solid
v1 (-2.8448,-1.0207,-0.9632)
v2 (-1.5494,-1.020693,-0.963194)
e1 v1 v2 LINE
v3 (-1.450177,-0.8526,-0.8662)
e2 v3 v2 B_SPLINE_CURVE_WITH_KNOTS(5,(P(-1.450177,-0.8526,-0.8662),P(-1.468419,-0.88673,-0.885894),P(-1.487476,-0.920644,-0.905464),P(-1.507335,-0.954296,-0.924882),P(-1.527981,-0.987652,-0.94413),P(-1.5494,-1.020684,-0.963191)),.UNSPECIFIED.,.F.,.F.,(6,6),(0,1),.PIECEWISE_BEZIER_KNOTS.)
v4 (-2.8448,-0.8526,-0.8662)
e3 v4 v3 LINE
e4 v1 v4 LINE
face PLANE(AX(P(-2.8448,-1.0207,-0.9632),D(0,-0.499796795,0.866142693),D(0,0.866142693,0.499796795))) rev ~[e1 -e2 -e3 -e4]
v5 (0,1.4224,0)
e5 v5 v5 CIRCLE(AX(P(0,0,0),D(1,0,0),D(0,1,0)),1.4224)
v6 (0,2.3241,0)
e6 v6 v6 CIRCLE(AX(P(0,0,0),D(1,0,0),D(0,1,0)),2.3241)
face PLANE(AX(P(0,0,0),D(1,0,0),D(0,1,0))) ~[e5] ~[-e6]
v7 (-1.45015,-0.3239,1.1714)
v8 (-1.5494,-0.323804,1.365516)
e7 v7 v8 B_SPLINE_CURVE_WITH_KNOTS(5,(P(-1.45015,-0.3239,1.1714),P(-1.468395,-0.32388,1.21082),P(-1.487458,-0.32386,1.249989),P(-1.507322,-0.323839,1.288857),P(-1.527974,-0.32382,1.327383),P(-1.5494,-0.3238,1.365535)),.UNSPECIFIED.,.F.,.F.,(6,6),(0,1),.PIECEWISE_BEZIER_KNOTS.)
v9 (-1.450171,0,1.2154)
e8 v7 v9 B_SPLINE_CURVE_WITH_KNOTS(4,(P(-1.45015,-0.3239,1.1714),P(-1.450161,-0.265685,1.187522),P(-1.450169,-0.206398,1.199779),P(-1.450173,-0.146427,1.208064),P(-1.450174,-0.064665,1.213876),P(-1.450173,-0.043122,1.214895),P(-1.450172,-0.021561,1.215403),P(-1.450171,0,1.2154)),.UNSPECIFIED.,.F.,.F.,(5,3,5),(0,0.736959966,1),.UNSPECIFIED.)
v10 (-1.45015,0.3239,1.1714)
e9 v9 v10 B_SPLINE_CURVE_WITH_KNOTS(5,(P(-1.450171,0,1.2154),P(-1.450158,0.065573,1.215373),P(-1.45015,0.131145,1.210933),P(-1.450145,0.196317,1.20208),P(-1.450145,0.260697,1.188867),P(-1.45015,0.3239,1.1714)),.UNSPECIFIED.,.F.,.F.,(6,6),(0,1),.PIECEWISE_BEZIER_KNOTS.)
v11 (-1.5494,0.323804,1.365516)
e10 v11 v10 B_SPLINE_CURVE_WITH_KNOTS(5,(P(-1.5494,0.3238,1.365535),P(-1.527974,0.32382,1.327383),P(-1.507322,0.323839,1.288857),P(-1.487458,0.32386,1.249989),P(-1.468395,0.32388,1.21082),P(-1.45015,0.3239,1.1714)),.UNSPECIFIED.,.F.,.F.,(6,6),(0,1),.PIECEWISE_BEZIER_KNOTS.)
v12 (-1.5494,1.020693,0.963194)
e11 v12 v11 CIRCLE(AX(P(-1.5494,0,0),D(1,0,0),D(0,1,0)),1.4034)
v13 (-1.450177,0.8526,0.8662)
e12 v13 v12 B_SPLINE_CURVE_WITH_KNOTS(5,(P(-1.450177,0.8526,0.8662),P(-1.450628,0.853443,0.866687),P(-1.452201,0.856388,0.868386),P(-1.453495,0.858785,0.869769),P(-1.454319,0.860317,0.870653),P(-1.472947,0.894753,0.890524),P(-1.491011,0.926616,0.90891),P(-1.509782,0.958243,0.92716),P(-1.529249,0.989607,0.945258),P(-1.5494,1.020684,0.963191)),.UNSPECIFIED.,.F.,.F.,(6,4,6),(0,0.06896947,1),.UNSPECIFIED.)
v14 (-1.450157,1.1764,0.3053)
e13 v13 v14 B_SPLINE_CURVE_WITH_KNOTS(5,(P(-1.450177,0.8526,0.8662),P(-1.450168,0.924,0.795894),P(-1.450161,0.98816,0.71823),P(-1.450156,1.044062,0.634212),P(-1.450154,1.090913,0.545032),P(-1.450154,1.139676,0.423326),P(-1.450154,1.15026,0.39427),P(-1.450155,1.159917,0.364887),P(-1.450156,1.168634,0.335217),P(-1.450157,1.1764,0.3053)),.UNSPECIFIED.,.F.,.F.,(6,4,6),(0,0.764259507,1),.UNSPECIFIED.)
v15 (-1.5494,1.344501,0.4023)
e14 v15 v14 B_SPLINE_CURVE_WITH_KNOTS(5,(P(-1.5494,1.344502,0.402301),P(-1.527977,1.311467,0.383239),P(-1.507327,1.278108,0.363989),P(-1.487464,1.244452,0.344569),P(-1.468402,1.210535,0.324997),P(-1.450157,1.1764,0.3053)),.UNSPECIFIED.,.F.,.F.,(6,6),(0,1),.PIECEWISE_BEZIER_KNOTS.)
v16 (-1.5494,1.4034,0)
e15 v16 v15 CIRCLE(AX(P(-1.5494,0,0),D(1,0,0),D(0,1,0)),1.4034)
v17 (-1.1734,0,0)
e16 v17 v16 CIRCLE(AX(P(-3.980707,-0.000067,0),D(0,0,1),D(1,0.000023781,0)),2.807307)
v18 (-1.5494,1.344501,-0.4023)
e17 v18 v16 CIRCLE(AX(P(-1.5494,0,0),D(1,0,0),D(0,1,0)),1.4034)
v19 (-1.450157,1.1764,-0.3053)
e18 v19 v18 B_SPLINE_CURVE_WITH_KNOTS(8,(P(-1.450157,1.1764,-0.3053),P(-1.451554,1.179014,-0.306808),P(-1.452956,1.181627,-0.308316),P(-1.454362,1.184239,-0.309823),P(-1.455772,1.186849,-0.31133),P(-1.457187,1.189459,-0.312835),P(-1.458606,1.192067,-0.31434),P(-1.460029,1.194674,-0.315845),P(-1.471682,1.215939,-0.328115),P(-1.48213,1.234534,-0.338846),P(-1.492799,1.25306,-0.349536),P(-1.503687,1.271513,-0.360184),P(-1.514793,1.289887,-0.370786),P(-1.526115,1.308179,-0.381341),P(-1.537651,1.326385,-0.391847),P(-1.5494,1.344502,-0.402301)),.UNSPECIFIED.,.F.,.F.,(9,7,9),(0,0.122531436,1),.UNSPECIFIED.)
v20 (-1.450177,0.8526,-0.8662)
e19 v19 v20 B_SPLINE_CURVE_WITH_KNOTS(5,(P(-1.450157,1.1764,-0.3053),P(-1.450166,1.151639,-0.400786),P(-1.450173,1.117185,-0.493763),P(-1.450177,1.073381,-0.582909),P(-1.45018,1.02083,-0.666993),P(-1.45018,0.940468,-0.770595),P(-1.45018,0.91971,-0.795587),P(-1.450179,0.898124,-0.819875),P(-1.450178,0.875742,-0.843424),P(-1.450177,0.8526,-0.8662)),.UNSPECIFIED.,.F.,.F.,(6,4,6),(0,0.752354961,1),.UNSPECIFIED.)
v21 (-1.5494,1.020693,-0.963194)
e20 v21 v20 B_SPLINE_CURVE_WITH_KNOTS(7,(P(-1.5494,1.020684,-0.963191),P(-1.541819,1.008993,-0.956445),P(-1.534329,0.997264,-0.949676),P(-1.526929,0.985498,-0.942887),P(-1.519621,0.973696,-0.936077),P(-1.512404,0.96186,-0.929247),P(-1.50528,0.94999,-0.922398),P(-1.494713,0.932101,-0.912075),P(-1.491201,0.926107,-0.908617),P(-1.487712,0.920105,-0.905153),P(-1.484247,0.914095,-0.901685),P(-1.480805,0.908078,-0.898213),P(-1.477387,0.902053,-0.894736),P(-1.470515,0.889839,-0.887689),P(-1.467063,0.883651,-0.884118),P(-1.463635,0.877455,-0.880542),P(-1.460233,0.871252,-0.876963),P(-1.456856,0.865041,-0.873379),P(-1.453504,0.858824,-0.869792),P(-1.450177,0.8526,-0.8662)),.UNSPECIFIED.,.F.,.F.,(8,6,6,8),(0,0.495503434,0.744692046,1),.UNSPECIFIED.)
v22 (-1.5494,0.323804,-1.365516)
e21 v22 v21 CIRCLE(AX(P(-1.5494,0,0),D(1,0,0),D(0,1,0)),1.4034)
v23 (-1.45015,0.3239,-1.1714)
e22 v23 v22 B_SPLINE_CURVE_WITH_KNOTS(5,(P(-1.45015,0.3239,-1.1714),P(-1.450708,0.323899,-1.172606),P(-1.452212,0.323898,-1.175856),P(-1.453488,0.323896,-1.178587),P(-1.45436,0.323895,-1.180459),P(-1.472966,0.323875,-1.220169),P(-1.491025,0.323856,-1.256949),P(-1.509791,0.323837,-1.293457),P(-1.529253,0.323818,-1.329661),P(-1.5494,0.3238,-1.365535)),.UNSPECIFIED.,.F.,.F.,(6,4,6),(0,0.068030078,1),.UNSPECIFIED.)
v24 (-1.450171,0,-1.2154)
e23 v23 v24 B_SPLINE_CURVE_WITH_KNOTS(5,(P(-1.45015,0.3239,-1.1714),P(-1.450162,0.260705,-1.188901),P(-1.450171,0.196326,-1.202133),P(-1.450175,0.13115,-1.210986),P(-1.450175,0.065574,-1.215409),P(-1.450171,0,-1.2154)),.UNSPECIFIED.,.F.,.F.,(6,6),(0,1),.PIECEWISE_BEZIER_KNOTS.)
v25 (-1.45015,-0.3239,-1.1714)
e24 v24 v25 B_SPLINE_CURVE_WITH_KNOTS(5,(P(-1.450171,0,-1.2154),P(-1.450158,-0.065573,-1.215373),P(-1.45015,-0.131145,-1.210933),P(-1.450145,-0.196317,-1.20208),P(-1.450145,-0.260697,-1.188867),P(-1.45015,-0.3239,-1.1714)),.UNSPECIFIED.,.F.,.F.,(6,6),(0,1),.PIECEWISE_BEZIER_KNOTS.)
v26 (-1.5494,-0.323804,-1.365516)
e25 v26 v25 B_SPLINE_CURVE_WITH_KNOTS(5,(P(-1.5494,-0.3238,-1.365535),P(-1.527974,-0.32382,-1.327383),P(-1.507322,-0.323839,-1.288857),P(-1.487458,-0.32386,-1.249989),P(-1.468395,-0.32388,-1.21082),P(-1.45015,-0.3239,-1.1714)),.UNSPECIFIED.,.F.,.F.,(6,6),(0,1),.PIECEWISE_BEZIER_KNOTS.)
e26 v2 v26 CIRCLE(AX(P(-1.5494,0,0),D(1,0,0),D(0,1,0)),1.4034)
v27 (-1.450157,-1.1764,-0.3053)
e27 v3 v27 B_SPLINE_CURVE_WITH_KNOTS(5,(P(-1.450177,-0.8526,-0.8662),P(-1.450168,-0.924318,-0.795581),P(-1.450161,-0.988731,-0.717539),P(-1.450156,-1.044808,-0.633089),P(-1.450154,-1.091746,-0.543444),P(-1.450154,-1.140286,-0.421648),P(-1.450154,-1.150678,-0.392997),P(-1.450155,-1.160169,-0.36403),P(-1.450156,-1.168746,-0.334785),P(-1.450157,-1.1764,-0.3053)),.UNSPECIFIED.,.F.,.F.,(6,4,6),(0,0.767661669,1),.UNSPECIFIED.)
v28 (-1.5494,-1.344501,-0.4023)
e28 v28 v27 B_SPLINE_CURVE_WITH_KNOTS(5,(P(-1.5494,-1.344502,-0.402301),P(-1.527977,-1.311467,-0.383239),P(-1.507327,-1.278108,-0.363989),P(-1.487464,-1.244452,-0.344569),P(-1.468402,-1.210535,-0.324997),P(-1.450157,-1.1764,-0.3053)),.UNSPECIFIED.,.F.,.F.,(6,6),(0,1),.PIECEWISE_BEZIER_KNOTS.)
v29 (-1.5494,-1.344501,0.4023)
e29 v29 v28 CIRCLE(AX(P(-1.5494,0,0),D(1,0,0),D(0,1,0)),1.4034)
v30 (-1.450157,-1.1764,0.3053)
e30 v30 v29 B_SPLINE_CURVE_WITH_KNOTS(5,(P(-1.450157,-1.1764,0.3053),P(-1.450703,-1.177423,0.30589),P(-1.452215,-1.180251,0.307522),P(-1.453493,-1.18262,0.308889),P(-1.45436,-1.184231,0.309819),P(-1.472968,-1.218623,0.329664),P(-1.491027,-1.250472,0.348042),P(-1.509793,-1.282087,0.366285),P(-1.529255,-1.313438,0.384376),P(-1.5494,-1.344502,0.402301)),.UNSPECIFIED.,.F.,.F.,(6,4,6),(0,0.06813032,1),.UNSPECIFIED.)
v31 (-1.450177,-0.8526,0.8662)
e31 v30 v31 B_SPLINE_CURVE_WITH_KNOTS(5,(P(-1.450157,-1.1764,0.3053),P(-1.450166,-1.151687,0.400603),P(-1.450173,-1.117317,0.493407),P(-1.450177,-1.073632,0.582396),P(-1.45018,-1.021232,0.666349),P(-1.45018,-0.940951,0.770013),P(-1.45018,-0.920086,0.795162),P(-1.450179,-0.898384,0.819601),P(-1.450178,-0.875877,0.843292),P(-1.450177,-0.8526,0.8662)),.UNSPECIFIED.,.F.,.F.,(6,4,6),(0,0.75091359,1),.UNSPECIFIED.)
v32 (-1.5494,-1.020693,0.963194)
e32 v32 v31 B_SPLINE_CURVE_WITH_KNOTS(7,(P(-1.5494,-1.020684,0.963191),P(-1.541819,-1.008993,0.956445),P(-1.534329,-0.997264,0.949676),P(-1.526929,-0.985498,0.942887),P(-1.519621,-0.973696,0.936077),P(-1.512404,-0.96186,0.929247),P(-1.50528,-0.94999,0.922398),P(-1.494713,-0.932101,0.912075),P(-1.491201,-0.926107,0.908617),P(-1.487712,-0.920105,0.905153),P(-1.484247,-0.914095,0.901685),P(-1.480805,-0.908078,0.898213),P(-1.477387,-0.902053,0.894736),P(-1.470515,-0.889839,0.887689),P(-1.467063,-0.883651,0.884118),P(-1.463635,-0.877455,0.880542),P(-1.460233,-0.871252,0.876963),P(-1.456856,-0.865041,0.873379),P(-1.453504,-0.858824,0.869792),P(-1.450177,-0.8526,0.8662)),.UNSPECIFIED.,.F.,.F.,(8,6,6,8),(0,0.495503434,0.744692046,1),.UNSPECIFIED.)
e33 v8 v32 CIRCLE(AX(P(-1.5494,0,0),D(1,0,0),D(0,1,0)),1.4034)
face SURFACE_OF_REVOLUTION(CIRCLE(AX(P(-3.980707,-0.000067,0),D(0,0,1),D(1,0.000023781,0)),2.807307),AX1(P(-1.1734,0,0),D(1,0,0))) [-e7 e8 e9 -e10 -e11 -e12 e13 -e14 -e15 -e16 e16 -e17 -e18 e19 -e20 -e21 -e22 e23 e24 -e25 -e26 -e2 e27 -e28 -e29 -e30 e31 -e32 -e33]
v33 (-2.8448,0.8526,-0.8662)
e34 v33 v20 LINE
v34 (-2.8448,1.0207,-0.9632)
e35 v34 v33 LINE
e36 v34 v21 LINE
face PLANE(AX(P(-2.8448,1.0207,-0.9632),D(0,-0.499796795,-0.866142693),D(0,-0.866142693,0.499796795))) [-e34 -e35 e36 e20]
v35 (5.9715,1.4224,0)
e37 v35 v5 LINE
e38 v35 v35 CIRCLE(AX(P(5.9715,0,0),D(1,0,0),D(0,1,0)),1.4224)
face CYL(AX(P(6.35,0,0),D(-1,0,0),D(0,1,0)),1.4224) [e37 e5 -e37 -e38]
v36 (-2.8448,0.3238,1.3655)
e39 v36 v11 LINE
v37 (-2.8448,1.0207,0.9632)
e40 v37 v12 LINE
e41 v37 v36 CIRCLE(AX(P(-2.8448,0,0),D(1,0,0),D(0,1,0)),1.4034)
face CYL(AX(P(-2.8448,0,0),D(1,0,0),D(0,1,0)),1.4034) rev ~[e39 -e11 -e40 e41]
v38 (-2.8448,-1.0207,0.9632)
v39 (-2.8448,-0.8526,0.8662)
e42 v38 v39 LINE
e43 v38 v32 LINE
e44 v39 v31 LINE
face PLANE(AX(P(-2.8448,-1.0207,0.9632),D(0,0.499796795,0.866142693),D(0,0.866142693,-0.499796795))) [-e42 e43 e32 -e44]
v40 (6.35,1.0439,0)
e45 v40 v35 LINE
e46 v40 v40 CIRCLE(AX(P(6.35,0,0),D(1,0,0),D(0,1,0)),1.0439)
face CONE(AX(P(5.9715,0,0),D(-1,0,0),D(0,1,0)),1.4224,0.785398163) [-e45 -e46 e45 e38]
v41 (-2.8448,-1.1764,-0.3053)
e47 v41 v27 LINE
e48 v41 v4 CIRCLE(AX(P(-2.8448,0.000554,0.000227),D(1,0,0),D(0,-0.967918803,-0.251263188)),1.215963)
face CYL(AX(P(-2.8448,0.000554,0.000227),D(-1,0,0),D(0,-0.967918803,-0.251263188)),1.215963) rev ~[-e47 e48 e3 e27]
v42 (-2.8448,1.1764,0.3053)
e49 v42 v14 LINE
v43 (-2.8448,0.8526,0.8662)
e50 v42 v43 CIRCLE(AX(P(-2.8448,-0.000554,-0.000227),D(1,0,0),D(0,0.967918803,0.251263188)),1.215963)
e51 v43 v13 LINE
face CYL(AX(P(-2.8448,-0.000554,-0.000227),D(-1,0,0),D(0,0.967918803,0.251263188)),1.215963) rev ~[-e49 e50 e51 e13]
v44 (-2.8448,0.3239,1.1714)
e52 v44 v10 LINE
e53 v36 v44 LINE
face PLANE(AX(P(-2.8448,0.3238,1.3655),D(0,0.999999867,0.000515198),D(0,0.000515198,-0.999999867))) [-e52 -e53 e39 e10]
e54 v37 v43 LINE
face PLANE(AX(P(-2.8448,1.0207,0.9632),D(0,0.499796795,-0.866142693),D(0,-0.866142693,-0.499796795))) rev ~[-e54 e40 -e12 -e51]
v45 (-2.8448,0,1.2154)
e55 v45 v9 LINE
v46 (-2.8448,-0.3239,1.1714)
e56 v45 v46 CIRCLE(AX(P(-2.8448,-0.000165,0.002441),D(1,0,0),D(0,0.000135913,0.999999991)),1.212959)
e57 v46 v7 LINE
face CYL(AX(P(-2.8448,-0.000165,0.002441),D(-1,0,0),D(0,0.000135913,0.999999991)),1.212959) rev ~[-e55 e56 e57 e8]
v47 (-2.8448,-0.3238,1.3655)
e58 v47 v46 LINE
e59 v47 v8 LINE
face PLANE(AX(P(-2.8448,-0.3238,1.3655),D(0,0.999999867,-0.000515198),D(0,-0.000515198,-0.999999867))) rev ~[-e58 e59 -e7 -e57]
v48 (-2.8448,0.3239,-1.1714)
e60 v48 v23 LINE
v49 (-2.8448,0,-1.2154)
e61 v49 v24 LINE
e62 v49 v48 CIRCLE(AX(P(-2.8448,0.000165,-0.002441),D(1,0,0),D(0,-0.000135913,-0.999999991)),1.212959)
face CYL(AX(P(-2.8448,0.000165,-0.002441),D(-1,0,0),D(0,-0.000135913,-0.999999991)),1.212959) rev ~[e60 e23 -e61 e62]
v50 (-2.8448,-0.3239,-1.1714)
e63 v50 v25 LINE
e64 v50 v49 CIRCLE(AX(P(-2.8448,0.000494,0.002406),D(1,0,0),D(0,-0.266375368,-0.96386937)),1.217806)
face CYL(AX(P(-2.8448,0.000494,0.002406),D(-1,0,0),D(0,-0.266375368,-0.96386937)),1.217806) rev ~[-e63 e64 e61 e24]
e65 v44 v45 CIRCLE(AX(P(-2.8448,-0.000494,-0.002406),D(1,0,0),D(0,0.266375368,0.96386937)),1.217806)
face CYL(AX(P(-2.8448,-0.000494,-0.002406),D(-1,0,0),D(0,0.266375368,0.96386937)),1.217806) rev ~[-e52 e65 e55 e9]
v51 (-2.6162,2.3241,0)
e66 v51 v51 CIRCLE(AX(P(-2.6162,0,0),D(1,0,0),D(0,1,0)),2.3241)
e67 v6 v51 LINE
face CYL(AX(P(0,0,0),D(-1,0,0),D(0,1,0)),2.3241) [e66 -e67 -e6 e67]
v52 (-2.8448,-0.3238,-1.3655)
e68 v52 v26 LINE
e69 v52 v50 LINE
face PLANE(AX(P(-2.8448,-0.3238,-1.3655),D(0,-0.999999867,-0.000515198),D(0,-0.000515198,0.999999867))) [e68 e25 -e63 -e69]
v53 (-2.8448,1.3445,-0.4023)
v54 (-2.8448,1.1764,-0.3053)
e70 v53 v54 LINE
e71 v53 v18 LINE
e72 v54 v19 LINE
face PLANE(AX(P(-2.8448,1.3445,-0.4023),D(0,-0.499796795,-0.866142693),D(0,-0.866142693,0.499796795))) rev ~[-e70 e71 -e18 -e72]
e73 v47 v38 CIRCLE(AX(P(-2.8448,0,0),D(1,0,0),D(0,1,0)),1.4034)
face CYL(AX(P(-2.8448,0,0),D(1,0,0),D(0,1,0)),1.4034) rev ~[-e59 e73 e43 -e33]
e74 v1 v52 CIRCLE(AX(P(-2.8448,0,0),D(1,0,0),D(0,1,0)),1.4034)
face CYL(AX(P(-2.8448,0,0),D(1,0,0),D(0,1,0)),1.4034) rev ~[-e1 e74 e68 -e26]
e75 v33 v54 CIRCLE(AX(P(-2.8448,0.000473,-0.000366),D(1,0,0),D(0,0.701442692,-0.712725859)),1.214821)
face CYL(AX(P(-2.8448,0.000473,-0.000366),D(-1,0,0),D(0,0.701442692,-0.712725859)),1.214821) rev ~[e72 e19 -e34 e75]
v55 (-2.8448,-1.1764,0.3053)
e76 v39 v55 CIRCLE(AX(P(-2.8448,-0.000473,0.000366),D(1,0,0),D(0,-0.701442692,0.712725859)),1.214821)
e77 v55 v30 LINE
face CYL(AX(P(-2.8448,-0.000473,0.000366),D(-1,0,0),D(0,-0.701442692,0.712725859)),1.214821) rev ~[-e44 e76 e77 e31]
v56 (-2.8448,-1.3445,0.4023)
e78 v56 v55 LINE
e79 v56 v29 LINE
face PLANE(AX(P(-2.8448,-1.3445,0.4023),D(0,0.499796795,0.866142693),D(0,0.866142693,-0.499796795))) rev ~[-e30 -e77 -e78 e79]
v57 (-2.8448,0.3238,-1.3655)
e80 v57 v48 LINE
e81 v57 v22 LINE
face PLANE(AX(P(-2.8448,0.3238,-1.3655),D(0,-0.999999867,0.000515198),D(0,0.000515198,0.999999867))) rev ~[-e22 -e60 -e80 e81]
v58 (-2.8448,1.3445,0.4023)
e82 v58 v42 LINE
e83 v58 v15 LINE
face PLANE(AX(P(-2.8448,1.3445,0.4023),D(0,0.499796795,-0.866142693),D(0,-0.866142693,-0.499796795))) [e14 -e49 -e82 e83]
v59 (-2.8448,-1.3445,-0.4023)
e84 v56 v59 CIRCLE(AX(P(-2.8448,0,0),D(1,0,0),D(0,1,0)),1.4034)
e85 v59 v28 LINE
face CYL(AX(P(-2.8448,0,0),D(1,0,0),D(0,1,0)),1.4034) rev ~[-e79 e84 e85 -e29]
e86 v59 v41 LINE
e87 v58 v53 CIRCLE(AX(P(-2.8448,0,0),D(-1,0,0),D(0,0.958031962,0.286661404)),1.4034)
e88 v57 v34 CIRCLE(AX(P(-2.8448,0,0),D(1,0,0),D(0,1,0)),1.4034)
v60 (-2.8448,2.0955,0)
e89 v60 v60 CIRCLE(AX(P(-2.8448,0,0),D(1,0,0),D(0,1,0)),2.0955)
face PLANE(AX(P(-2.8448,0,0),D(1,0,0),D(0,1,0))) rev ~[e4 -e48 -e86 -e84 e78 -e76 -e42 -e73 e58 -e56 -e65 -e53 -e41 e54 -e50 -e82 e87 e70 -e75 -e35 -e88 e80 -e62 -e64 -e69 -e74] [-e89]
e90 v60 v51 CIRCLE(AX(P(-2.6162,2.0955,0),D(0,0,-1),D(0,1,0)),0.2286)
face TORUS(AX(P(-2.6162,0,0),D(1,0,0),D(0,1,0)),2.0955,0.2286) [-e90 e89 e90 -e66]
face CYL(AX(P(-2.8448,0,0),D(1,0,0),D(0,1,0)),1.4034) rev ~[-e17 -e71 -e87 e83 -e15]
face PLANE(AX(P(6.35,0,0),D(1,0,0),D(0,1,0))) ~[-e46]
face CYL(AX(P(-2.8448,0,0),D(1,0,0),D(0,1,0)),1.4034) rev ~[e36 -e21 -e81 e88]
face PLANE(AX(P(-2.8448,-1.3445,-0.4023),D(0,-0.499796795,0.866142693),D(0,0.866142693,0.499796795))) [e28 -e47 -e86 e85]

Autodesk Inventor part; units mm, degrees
ref_plane "YZ Plane" through (0, 0, 0) normal (1, 0, 0) x (0, 1, 0)
sketch "Sketch1" plane through (0, 0, 0) normal (0, 0, 1) x (1, 0, 0)
  line L0 (-2.8448, 0) -> (6.35, 0)
  line L1 (6.35, 0) -> (6.35, 1.4224)
  line L2 (6.35, 1.4224) -> (0, 1.4224)
  line L3 (0, 1.4224) -> (0, 2.3241)
  line L4 (-7.3162, 0) -> (16.036, 0) projected
  line L5 (0, -0.4648) -> (0, 2.7889) projected
  line L6 (0, 2.3241) -> (-2.8448, 2.3241)
  line L7 (-2.8448, 0) -> (-2.8448, 2.3241)
  arc A0 (-1.1734, 0) -> (-1.5494, 1.4034) centre (-3.9802, 0) ccw
  line L8 (-2.8448, 1.4034) -> (-1.5494, 1.4034)
  line L9 (12.7, 1.4224) -> (0, 1.4224) construction
  dimension "d0" = 6.35
  dimension "d1" = 2.8448
  dimension "d2" = 2.8448
  dimension "d5" = 4.6482
  dimension "d13" = 2.8068
  dimension "d14" = 2.8068
  dimension "d15" = 1.2954
revolve "Body" add sketch "Sketch1" angle 360 about axis through (-2.8448, 0, 0) along (1, 0, 0) contours A0 L8 L7 L6 L3 L5 L0 | L5 L2 L1 L0
ref_plane "IDS_WORKPLANE{1}" through (-2.8448, 0, 0) normal (1, 0, 0) x (0, 0, -1)
sketch "Sketch2" plane through (-2.8448, 0, 0) normal (1, 0, 0) x (0, 0, -1)
  line L0 (0, -3.6027) -> (0, 5.3473) projected
  line L1 (5.6384, 0) -> (-3.6512, 0) projected
  circle A0 centre (0, 0) radius 2.3241 projected
  line L2 (1.3655, 0.3238) -> (1.1714, 0.3239)
  line L3 (0, 0) -> (1.3655, 0.3238) construction
  line L4 (0, 0) -> (4.3113, 4.0687) construction
  line L5 (0, 0) -> (0.4023, 1.3445) construction
  line L6 (0, 0) -> (0.7017, 1.2154) construction
  line L7 (0.4023, 1.3445) -> (0.3053, 1.1764)
  line L8 (0.9632, 1.0207) -> (0.8662, 0.8526)
  line L9 (0, 0) -> (0.9632, 1.0207) construction
  arc A1 (1.2154, 0) -> (1.1714, 0.3239) centre (0, 0) ccw
  arc A2 (0.8662, 0.8526) -> (0.3053, 1.1764) centre (0, 0) ccw
  arc A3 (1.4034, 0) -> (1.3655, 0.3238) centre (0, 0) ccw
  arc A4 (0.9632, 1.0207) -> (0.4023, 1.3445) centre (0, 0) ccw
  arc A5 (1.3655, 0.3238) -> (0.8276, 1.1334) centre (0, 0) ccw construction
  arc A6 (1.1714, 0.3239) -> (0.8662, 0.8526) centre (0, 0) ccw construction
  line L10 (1.3655, -0.3238) -> (1.1714, -0.3239)
  line L11 (0.4023, -1.3445) -> (0.3053, -1.1764)
  line L12 (0.9632, -1.0207) -> (0.8662, -0.8526)
  arc A7 (1.1714, -0.3239) -> (1.2154, 0) centre (0, 0) ccw
  arc A8 (0.3053, -1.1764) -> (0.8662, -0.8526) centre (0, 0) ccw
  arc A9 (1.3655, -0.3238) -> (1.4034, 0) centre (0, 0) ccw
  arc A10 (0.4023, -1.3445) -> (0.9632, -1.0207) centre (0, 0) ccw
  line L13 (-1.3655, 0.3238) -> (-1.1714, 0.3239)
  line L14 (-0.4023, 1.3445) -> (-0.3053, 1.1764)
  line L15 (-0.9632, 1.0207) -> (-0.8662, 0.8526)
  arc A11 (-1.1714, 0.3239) -> (-1.2154, 0) centre (0, 0) ccw
  arc A12 (-0.3053, 1.1764) -> (-0.8662, 0.8526) centre (0, 0) ccw
  arc A13 (-1.3655, 0.3238) -> (-1.4034, 0) centre (0, 0) ccw
  arc A14 (-0.4023, 1.3445) -> (-0.9632, 1.0207) centre (0, 0) ccw
  line L16 (-0.4023, -1.3445) -> (-0.3053, -1.1764)
  arc A15 (-0.8662, -0.8526) -> (-0.3053, -1.1764) centre (0, 0) ccw
  line L17 (-0.9632, -1.0207) -> (-0.8662, -0.8526)
  arc A16 (-0.9632, -1.0207) -> (-0.4023, -1.3445) centre (0, 0) ccw
  arc A17 (-1.2154, 0) -> (-1.1714, -0.3239) centre (0, 0) ccw
  line L18 (-1.3655, -0.3238) -> (-1.1714, -0.3239)
  arc A18 (-1.4034, 0) -> (-1.3655, -0.3238) centre (0, 0) ccw
  point P0 (0.7017, -1.2154)
  point P1 (-0.7017, 1.2154)
  point P2 (-0.7017, -1.2154)
  dimension "d19" = 0.3239
  dimension "d20" = 0.6477
  dimension "d21" = 33.316
  dimension "d22" = 2.8068
  dimension "d23" = 2.4308
extrude "Slot" add sketch "Sketch2" along normal up to next contours A1 L2 A3 L1 | L1 A9 L10 A7 | A17 L18 A18 L1 | L1 A13 L13 A11 | A4 L8 A2 L7 | L11 A8 L12 A10 | L14 A12 L15 A14 | A16 L17 A15 L16
fillet "Fillet1" radius 0.2286 1 edges at (-2.8448, -2.3241, 0)
thread "Thread" size "4-40 UNC" class "2A" standard "ANSI Unified Screw Threads" length 4.7625
chamfer "Chamfer1" distance 0.3785 distance2 0.3785 1 edges at (6.35, -1.4224, 0) measured on face at (6.35, -0.3549, 0.3144)
ref_plane "Work Plane2" through (-1.4224, 0, 0) normal (0, 0, -1) x (1, 0, 0)
equation "\"d19\" = 0.5 * SBR"
equation "\"d20\" = SBR"
equation "\"d22\" = 1.1547 * SW"
equation "\"d23\" = SW"
equation "\"d17\" = INTI"
equation "\"d24\" = RR"
equation "\"d6\" = GEL"
equation "\"d9\" = -0.5 * SPD + 0.5 * NND"
equation "\"d10\" = GUL"
equation "\"d0\" = NLG"
equation "\"d1\" = KOH"
equation "\"d2\" = NND"
equation "\"d5\" = KOD"
equation "\"d13\" = 1.1547 * SW"
equation "\"d14\" = 1.1547 * SW"
equation "\"d15\" = INTI"
equation "\"NND\" = 2.8448"
equation "\"NLG\" = 6.35"
equation "\"GEL\" = 4.7625"
equation "\"KOD\" = 4.6482"
equation "\"KOH\" = 2.8448"
equation "\"SPD\" = GD1"
equation "\"GUL\" = 0.37846"
equation "\"SBR\" = 0.6477"
equation "\"INTI\" = 1.2954"
equation "\"d11\" = -KOH"
equation "\"SW\" = 2.43078"
equation "\"d16\" = 1.1547 * SW"
equation "\"d18\" = SW"
equation "\"RR\" = 0.2286"
equation "\"TOA\" = 30deg"
equation "\"GD1\" = 2.08788"
equation "\"THREADDIA\" = 2.8448"
equation "\"BDM\" = NND"
equation "\"GD\" = NND"
equation "\"GAL\" = 1.5875"
equation "\"E0\" = 2.86258"
properties part number "ANSI B18.3 - 4-40 UNC - 0.25, SSHCSI" material "Steel, Mild"
